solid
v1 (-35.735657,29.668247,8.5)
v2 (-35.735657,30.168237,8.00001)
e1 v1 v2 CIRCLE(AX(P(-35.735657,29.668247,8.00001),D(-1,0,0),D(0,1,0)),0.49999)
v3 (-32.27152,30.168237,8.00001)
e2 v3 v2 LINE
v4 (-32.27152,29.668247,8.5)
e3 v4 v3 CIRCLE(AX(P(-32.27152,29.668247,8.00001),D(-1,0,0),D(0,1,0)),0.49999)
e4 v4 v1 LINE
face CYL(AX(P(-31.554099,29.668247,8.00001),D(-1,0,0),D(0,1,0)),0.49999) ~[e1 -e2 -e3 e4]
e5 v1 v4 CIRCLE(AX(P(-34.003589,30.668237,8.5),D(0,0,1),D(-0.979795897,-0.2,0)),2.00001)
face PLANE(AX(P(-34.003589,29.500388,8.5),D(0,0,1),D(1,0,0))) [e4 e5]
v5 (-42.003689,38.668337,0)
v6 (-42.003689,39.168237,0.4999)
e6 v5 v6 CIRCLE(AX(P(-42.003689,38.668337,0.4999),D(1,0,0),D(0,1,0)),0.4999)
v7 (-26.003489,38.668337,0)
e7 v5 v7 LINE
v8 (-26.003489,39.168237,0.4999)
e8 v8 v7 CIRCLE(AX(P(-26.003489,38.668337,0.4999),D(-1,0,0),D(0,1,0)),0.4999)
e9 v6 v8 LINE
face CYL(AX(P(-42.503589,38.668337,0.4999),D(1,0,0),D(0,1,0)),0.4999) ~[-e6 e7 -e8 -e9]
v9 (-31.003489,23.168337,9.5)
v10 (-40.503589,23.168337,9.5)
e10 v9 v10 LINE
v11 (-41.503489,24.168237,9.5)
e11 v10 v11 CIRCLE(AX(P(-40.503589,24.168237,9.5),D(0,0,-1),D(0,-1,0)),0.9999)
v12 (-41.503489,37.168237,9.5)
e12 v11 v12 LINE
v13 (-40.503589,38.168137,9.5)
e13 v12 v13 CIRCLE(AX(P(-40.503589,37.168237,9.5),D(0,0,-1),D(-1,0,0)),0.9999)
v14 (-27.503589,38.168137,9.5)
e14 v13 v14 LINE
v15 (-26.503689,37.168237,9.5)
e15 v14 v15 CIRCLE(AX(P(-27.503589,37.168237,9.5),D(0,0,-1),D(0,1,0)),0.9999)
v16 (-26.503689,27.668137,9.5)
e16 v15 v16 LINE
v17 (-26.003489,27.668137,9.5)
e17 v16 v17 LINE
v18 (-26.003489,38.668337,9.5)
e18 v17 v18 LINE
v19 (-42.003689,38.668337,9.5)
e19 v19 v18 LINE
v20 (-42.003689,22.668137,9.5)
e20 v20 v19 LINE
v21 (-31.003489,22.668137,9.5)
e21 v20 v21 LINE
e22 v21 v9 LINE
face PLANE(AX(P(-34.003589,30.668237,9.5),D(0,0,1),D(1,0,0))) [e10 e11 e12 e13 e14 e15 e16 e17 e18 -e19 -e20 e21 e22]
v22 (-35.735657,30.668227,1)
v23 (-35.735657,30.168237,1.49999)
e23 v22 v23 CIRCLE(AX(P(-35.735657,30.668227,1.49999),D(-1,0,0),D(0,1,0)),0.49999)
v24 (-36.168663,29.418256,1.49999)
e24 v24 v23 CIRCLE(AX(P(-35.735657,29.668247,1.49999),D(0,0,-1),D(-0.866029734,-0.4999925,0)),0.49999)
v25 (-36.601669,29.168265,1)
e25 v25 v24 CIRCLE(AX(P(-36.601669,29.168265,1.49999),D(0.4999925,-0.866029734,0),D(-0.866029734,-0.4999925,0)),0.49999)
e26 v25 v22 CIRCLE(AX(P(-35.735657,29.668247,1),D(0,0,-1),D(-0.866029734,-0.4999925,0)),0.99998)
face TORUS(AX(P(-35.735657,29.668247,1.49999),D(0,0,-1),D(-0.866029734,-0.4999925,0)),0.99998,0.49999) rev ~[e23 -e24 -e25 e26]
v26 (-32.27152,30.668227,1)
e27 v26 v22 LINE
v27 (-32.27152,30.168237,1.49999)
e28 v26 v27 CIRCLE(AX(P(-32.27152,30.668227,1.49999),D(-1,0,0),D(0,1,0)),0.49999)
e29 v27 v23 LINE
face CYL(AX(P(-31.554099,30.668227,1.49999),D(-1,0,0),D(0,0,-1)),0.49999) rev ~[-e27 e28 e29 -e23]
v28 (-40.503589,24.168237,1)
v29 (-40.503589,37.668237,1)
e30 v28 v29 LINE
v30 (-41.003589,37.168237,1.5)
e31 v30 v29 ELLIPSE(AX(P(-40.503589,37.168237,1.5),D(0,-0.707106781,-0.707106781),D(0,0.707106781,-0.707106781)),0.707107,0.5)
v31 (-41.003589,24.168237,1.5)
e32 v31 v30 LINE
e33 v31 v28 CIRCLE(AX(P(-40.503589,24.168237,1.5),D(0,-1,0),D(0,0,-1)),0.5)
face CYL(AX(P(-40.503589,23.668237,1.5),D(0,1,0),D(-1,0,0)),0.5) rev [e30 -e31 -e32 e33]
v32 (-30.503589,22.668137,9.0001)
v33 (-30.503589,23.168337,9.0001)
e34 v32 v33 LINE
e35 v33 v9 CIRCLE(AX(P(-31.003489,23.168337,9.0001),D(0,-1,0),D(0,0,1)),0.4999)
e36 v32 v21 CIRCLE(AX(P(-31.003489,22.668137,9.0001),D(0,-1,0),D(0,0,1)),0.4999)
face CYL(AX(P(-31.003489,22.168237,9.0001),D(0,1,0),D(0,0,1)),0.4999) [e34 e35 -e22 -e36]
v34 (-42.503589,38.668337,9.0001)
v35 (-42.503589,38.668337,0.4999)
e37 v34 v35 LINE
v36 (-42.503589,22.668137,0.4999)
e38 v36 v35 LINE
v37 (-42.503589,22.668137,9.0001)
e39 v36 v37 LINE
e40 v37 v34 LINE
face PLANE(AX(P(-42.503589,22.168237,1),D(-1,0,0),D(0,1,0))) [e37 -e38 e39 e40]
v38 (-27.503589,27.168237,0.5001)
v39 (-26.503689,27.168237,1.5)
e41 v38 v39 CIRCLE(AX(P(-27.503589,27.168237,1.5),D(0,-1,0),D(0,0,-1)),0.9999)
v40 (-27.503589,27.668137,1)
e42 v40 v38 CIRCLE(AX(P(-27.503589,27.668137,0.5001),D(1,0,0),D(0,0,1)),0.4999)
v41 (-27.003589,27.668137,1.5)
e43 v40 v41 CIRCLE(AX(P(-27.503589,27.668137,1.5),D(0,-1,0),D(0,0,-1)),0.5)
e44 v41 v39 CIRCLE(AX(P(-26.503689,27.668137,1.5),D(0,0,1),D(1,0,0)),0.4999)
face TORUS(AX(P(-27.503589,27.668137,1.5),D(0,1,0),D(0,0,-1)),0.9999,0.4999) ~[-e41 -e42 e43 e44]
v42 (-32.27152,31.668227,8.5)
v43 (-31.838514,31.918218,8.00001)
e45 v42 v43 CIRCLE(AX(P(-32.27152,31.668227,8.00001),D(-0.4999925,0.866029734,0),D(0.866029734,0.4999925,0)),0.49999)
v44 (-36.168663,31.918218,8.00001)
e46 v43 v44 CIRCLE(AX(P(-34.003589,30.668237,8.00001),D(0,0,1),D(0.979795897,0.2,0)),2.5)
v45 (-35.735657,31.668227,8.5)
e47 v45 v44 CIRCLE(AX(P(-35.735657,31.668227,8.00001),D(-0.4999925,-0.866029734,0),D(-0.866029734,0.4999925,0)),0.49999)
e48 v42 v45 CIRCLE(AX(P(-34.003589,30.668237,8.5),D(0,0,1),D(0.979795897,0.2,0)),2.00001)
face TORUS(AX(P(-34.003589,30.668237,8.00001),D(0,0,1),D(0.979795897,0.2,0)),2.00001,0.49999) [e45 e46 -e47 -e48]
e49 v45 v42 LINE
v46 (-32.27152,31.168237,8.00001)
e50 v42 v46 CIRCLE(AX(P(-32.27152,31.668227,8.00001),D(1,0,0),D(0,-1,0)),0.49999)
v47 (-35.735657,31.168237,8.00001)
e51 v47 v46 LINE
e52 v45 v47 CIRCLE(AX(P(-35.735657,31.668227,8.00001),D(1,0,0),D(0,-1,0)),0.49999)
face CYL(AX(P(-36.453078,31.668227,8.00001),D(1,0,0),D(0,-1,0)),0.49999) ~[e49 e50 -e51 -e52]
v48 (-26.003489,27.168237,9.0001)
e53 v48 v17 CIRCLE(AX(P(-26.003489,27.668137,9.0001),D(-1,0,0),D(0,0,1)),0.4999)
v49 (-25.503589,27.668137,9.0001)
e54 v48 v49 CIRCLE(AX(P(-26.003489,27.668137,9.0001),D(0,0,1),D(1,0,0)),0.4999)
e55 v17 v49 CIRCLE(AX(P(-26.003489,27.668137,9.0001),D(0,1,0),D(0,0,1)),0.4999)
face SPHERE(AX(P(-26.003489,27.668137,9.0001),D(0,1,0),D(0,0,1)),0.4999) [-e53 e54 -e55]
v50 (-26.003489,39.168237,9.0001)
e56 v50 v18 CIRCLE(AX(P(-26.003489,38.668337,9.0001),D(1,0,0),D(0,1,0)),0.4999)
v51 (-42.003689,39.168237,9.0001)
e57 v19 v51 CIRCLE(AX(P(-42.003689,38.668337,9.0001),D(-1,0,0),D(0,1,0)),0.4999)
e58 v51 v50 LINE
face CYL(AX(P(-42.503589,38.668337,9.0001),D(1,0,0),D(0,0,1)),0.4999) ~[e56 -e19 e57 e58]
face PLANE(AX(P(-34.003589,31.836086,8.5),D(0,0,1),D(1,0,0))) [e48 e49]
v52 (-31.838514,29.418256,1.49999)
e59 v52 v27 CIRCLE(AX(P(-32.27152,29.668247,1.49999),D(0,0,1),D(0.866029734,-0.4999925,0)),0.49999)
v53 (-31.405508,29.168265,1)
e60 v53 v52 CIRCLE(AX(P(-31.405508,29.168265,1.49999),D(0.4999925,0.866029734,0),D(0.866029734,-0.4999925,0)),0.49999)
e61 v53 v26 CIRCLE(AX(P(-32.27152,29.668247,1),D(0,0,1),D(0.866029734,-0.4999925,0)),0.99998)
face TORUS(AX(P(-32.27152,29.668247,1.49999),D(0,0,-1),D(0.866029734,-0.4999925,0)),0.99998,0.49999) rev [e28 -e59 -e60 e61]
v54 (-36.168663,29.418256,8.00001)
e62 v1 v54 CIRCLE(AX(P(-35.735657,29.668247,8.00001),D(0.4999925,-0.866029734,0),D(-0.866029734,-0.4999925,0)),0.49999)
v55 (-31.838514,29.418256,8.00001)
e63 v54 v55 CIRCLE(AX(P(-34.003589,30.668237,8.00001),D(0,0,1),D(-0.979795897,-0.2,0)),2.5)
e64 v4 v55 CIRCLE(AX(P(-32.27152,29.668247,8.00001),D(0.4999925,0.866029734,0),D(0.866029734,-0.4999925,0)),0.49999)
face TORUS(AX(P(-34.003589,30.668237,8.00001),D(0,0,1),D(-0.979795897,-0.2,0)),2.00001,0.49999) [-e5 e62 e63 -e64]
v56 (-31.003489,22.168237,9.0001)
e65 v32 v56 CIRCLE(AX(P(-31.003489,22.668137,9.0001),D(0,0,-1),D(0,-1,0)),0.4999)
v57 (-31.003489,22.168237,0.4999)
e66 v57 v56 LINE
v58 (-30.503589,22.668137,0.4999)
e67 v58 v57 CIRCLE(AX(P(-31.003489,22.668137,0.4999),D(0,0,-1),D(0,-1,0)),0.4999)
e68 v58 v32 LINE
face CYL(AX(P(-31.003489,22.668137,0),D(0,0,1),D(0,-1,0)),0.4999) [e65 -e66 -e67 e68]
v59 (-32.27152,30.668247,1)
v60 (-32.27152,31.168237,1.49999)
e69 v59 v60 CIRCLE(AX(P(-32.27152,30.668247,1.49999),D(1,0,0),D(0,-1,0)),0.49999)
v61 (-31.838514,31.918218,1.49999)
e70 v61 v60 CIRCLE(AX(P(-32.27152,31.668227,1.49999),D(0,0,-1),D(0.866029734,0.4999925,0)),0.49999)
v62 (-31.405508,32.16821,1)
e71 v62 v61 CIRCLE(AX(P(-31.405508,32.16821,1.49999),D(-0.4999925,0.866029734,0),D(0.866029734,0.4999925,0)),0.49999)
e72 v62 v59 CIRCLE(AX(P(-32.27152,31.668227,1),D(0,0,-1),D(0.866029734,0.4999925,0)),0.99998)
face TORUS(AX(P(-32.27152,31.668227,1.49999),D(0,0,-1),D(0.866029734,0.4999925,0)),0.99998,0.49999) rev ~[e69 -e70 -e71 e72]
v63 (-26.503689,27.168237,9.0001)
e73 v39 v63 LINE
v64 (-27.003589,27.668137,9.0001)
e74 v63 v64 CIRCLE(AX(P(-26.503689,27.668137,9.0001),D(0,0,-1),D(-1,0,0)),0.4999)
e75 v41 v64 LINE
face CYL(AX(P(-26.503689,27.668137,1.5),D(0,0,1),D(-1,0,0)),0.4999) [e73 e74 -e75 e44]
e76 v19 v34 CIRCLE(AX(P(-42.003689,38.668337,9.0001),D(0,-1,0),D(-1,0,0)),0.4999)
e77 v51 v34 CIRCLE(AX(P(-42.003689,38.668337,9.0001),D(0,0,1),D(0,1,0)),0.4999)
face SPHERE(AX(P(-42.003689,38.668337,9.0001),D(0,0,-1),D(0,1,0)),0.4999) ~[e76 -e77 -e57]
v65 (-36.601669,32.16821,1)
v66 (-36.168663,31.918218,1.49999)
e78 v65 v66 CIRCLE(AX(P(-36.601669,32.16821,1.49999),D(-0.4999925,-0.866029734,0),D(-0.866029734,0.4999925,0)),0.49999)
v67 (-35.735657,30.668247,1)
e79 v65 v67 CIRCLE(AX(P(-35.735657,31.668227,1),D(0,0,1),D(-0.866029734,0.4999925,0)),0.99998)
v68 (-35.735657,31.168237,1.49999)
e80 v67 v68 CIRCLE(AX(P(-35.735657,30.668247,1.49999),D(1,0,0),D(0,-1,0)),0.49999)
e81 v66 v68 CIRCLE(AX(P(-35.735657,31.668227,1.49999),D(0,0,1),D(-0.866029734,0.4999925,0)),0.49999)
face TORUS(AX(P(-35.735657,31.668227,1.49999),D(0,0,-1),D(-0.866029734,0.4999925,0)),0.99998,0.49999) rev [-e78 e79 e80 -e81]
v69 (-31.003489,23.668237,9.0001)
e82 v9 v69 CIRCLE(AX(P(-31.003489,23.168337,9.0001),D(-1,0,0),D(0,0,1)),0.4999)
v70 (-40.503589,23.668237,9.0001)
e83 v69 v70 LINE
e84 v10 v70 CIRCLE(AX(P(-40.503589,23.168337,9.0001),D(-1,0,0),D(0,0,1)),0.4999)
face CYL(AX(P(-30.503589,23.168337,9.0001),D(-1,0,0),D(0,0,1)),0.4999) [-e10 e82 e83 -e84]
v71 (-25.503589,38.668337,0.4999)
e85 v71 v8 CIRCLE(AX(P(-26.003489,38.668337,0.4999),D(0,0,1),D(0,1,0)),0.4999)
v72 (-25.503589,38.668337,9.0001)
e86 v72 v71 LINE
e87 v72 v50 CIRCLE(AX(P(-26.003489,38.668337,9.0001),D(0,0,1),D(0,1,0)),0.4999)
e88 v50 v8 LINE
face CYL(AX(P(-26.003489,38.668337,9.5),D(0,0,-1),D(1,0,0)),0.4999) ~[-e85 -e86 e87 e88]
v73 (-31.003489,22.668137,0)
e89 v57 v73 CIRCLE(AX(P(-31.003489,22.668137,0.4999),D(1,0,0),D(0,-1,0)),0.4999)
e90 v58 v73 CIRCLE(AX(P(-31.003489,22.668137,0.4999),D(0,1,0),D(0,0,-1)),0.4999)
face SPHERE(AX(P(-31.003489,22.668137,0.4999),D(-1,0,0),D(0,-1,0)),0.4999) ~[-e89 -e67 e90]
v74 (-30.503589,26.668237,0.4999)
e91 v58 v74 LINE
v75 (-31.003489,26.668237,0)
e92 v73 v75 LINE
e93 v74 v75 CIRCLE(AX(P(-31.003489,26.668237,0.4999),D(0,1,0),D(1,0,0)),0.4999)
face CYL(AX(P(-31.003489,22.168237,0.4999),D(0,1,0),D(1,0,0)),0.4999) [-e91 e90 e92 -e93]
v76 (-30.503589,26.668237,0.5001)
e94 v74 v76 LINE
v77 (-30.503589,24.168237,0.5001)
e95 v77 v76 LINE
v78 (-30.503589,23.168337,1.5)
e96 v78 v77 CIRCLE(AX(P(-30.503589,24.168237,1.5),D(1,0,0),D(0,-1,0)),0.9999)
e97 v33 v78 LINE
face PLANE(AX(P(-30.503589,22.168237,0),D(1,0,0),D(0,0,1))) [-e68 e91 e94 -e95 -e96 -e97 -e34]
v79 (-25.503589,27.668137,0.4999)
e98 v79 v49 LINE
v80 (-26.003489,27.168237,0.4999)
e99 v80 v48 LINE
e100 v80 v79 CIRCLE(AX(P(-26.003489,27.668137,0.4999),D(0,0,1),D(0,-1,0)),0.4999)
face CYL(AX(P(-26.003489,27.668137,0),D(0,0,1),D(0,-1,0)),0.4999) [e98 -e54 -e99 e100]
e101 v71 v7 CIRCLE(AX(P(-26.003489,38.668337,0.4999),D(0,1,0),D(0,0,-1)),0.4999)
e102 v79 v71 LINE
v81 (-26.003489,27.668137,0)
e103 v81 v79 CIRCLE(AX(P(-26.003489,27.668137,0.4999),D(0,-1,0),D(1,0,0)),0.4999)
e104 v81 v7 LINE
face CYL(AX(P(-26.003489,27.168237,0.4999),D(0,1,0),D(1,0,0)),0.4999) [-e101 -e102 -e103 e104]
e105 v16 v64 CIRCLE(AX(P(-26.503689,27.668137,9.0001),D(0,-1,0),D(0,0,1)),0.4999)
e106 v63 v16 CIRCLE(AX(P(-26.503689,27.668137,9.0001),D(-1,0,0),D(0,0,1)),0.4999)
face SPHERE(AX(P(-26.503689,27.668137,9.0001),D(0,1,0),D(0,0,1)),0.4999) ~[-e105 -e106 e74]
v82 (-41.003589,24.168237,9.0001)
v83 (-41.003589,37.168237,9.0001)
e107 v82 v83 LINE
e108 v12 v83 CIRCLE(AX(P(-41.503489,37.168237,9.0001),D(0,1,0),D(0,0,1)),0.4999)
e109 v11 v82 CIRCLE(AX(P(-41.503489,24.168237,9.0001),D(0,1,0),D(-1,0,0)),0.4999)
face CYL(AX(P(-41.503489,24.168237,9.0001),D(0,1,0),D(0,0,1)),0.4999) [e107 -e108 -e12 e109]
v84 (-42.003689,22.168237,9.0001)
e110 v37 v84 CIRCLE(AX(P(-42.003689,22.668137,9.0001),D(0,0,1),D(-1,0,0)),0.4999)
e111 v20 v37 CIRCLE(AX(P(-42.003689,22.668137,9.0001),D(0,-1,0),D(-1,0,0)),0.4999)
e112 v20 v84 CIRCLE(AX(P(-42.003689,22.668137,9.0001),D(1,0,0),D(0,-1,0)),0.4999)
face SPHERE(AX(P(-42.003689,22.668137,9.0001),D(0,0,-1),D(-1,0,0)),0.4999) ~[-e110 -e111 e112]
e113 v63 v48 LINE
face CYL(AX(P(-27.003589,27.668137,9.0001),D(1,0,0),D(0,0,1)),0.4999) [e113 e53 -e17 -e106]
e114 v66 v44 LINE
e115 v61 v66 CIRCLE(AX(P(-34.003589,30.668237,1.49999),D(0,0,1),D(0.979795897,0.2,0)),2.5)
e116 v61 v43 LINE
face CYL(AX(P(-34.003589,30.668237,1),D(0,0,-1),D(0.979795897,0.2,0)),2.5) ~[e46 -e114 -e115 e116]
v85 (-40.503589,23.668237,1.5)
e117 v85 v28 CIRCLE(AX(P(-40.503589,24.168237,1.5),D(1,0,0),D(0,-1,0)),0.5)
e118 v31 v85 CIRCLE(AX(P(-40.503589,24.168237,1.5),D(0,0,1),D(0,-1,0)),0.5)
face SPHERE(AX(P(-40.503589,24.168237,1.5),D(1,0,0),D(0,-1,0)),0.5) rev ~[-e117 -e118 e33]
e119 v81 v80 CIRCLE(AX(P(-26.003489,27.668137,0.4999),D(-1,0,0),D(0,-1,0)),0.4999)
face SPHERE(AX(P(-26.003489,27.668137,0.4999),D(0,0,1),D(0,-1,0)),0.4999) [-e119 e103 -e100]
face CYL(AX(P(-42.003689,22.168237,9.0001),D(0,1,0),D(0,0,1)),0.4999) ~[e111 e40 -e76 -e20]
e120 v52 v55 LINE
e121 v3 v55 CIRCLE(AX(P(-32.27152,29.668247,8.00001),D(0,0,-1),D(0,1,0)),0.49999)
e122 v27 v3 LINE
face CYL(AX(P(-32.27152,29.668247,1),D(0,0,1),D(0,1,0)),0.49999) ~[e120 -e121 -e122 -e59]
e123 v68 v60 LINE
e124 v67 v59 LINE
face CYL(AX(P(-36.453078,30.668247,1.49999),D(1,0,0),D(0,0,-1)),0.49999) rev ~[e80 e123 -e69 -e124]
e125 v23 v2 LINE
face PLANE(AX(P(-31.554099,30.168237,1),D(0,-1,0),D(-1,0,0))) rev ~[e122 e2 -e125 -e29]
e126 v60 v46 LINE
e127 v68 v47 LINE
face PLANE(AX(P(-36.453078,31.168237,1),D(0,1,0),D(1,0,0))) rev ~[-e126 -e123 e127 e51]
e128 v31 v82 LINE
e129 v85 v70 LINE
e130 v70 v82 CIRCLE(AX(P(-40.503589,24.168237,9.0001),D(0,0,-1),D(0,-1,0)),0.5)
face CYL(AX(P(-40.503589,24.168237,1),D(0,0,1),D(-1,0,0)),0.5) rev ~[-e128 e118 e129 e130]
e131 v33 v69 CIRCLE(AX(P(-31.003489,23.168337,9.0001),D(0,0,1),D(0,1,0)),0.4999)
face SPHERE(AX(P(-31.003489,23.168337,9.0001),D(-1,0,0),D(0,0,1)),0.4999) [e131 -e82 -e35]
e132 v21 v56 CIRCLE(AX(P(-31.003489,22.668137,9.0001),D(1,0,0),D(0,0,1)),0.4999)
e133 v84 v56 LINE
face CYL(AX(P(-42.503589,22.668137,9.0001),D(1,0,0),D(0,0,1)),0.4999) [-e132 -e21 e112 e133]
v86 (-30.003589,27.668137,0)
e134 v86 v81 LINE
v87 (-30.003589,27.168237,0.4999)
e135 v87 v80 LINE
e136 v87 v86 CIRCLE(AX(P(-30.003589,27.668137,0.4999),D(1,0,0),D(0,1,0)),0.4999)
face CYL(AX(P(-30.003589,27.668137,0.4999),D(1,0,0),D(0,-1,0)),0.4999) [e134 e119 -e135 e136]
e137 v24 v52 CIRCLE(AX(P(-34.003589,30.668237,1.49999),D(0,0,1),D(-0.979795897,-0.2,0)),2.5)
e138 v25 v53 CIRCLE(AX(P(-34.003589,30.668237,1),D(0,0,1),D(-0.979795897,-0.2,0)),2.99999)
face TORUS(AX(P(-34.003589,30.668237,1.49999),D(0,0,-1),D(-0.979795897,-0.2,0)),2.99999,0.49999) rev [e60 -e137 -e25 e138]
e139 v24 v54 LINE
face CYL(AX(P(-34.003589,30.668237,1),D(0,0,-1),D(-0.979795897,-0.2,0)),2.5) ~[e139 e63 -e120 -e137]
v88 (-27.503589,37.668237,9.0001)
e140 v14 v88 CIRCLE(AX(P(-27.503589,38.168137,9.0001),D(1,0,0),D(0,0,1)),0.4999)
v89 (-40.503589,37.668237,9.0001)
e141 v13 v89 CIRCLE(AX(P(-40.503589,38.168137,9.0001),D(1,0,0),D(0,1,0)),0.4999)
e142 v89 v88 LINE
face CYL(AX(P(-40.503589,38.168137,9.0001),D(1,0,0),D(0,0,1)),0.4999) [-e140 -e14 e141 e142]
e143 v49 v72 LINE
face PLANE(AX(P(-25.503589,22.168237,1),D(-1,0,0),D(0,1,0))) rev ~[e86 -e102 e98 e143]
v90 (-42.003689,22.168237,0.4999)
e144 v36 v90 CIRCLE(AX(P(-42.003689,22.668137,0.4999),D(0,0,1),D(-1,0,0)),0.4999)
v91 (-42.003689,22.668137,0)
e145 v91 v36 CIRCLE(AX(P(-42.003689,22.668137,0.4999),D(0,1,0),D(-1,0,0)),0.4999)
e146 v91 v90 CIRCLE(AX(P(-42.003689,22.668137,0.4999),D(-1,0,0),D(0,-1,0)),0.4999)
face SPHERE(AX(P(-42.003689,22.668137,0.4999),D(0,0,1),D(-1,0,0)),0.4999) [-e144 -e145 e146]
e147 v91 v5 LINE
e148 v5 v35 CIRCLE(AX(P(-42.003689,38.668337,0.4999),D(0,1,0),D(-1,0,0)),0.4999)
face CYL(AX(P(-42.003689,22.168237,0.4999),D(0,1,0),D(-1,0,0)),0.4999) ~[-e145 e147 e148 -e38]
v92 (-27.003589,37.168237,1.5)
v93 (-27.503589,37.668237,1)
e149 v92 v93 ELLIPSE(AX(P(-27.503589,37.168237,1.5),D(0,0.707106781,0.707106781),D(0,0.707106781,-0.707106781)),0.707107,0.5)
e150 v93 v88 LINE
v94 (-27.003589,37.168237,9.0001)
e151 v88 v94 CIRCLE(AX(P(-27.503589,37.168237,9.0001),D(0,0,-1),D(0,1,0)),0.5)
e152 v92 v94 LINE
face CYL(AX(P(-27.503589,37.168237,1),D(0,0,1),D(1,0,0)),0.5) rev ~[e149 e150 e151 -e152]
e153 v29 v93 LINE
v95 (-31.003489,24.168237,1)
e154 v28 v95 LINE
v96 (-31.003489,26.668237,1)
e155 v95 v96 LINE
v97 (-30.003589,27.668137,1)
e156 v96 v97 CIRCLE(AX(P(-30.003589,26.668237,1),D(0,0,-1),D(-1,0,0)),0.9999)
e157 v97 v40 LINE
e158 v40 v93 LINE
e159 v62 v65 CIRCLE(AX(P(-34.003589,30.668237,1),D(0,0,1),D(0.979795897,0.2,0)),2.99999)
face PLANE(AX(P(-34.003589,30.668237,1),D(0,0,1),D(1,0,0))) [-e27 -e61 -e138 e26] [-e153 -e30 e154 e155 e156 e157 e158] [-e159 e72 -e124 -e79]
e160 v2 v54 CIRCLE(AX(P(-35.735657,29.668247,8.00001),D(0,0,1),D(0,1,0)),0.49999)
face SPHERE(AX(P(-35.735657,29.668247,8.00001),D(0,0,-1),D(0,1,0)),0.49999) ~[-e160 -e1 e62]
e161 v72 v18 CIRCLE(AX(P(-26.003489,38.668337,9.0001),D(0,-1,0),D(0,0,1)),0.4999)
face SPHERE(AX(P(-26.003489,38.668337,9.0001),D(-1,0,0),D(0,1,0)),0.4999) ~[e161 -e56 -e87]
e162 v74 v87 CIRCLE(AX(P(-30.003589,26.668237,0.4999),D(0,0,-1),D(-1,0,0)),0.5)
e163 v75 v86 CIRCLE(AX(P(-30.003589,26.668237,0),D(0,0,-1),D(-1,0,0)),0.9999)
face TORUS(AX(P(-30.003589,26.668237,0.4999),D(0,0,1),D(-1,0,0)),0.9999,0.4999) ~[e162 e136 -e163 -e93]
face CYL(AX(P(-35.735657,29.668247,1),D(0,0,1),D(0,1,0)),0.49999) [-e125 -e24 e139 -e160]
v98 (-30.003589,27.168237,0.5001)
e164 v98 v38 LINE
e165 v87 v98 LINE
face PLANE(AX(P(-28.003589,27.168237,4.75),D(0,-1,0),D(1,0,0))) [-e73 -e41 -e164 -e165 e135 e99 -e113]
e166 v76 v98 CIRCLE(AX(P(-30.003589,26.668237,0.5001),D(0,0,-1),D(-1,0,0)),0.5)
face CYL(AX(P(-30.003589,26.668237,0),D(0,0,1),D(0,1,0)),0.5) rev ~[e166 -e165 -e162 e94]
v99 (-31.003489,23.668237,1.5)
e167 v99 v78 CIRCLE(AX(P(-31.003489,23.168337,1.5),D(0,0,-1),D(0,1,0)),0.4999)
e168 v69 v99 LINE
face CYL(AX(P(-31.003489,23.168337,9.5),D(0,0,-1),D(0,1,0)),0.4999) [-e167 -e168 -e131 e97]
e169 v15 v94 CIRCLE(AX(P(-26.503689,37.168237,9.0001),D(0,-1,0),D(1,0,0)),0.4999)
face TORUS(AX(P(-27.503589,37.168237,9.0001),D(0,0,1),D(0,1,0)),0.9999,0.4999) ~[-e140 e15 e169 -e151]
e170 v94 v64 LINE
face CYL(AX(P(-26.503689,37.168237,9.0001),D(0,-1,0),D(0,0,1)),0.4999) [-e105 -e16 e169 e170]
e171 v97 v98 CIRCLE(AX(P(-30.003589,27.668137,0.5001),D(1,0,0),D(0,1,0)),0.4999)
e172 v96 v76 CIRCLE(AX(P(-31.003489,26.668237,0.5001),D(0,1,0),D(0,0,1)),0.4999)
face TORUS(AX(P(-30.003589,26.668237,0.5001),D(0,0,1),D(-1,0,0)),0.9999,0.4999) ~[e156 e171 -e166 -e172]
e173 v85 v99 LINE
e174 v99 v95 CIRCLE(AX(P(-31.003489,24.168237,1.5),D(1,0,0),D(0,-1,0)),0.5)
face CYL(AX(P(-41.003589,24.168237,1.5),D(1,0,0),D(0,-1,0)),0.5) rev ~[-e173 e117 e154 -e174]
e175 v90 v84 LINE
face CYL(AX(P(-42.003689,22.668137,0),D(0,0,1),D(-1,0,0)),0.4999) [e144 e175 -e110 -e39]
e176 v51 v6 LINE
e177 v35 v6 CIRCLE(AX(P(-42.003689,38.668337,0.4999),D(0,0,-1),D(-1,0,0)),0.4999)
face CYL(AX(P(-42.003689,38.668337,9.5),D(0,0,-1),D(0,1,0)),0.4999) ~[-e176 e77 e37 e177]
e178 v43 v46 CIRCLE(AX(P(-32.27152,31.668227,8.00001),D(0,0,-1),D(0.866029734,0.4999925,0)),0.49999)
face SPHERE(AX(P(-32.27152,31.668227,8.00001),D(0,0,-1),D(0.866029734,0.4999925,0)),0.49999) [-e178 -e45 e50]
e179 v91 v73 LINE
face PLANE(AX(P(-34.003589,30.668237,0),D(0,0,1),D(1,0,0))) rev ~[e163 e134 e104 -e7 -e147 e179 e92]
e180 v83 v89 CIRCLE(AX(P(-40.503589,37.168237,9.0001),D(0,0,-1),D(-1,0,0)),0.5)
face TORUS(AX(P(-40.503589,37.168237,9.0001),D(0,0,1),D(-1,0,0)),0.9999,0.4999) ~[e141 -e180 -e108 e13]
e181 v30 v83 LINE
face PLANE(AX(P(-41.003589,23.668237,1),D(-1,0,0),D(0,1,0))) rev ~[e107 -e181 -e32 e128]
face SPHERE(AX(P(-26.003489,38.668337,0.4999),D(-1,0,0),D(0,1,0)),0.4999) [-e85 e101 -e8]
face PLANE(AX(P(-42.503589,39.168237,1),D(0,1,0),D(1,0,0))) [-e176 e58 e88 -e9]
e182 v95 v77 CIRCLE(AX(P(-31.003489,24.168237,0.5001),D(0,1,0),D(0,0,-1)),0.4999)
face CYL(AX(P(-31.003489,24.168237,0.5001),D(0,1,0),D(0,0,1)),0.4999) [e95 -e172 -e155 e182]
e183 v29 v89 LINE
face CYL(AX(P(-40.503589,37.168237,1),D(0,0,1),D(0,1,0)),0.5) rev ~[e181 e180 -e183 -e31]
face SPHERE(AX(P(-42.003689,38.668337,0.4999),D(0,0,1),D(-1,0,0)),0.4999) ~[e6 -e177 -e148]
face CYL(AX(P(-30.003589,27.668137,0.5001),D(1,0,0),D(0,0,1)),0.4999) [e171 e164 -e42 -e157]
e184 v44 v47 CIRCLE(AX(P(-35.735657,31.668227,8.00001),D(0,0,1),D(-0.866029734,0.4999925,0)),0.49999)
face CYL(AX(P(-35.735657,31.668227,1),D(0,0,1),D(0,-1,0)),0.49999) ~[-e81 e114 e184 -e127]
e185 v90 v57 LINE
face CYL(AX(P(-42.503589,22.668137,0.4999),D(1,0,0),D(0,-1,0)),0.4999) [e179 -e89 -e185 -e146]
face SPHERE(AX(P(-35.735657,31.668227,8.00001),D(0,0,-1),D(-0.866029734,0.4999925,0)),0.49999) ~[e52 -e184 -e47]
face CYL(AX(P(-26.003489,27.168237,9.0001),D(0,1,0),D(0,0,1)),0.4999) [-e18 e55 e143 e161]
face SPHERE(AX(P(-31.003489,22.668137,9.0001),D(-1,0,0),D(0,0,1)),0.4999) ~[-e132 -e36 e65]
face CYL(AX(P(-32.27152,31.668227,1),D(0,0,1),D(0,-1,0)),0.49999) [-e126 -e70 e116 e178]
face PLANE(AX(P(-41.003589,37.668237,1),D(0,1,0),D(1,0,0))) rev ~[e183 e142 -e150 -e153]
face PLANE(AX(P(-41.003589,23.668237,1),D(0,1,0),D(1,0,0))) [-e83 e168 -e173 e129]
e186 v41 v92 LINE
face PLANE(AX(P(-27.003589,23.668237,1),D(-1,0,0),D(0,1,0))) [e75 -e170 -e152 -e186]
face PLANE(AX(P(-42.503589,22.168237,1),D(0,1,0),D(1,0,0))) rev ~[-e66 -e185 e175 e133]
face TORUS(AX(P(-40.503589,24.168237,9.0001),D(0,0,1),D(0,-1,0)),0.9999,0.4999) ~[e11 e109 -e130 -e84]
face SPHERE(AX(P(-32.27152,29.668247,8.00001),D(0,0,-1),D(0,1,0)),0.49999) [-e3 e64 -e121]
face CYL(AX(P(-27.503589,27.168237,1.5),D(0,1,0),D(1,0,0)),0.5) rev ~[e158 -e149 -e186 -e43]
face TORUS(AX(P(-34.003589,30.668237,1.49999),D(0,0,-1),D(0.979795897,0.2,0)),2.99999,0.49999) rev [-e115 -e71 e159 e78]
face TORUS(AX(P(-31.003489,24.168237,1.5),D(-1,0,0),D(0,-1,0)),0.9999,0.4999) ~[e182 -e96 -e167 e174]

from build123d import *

# Parameters (mm, degrees)
F0_W     = 17
F0_H     = 17
F1_DEPTH = 1
F2_W     = 17
F2_H     = 17
F2_W_2   = 14
F2_H_2   = 14
F3_DEPTH = 8.5
F4_W     = 5
F4_H     = 9.5
F5_DEPTH = 5
F7_DEPTH = 7.5
F8_F1_R  = 0.5
F8_F2_R  = 0.4999
F9_R     = 0.49999


# Not quite as in the source:
# - a fillet or chamfer is up to 0.001 mm smaller than in the source, because OpenCascade refuses the exact size
# - a feature names something its author has since deleted; it is built from what else it names


with BuildPart() as f1:
    # F0 (on Top) → F1 (new body)
    with BuildSketch(Plane.XY):
        with Locations((-34.0035885349, 30.668237003)):
            Rectangle(F0_W, F0_H)
    extrude(amount=F1_DEPTH)

    # F2 (on face) → F3 (join)
    with BuildSketch(Plane.XY.offset(1)):
        with Locations((-34.0035885349, 30.668237003)):
            Rectangle(F2_W, F2_H)
        with Locations((-34.0035885349, 30.668237003)):
            Rectangle(F2_W_2, F2_H_2, mode=Mode.SUBTRACT)
    extrude(amount=F3_DEPTH)

    # F4 (on face) → F5 (cut)
    with BuildSketch(Plane.XZ.offset(-22.168237003)):
        with Locations((-28.0035885349, 4.75)):
            Rectangle(F4_W, F4_H)
    extrude(amount=-F5_DEPTH, mode=Mode.SUBTRACT)

    # F6 (on face) → F7 (join)
    with BuildSketch(Plane.XY.offset(1)):
        with BuildLine():
            Line((-31.5540987921, 30.168237003), (-36.4530782777, 30.168237003))
            ThreePointArc((-36.4530782777, 30.168237003), (-34.0035885349, 28.168237003), (-31.5540987921, 30.168237003))
        make_face()
        with BuildLine():
            Line((-36.4530782777, 31.168237003), (-31.5540987921, 31.168237003))
            ThreePointArc((-31.5540987921, 31.168237003), (-34.0035885349, 33.168237003), (-36.4530782777, 31.168237003))
        make_face()
    extrude(amount=F7_DEPTH)

    # F8: fillet of radius 0.5 on 31 edges, made by hand

    # F8_f1
    f8_f1_edges = [f1.edges().sort_by_distance(p)[0] for p in [
        (-35.7535885349, 23.668237003, 1),
        (-41.0035885349, 23.668237003, 5.25),
        (-41.0035885349, 30.668237003, 1),
        (-27.0035885349, 32.418237003, 1),
        (-27.0035885349, 37.668237003, 5.25),
        (-41.0035885349, 37.668237003, 5.25),
        (-30.5035885349, 27.168237003, 0.5),
    ]]
    fillet(f8_f1_edges, radius=F8_F1_R)

    # F8_f2 (radius 0.5 in the source; OpenCascade refuses exactly that, so slightly less here)
    f8_f2_edges = [f1.edges().sort_by_distance(p)[0] for p in [
        (-42.5035885349, 39.168237003, 4.75),
        (-42.5035885349, 22.168237003, 4.75),
        (-34.0035885349, 39.168237003, 9.5),
        (-42.5035885349, 30.668237003, 9.5),
        (-42.5035885349, 30.668237003, 0),
        (-34.0035885349, 39.168237003, 0),
        (-25.5035885349, 39.168237003, 4.75),
        (-34.0035885349, 37.668237003, 9.5),
        (-41.0035885349, 30.668237003, 9.5),
        (-35.5035885349, 23.668237003, 9.5),
        (-36.5035885349, 22.168237003, 9.5),
        (-30.5035885349, 22.918237003, 9.5),
        (-27.0035885349, 32.168237003, 9.5),
        (-25.5035885349, 33.168237003, 9.5),
        (-26.2535885349, 27.168237003, 9.5),
        (-27.0035885349, 27.168237003, 5.5),
        (-25.5035885349, 27.168237003, 4.75),
        (-36.5035885349, 22.168237003, 0),
        (-30.5035885349, 22.168237003, 4.75),
        (-30.5035885349, 24.418237003, 0),
        (-30.5035885349, 25.418237003, 1),
        (-27.7535885349, 27.168237003, 0),
        (-25.5035885349, 33.168237003, 0),
        (-30.5035885349, 23.668237003, 5.5),
        (-30.5035885349, 23.8146836124, 1.1464466094),
        (-30.3571419255, 27.0217903936, 0),
        (-30.3571419255, 27.0217903936, 1),
        (-27.1500351443, 27.168237003, 1.1464466094),
        (-27.1500351443, 37.5217903936, 9.5),
        (-40.8571419255, 23.8146836124, 9.5),
        (-40.8571419255, 37.5217903936, 9.5),
    ]]
    fillet(f8_f2_edges, radius=F8_F2_R)

    # F9 (radius 0.5 in the source; OpenCascade refuses exactly that, so slightly less here)
    f9_edges = [f1.edges().sort_by_distance(p)[0] for p in [
        (-34.003589, 33.168237, 8.5),
        (-34.003589, 31.168237, 8.5),
        (-34.003589, 30.168237, 8.5),
        (-34.003589, 28.168237, 8.5),
        (-31.554099, 31.168237, 4.75),
        (-36.453078, 30.168237, 4.75),
        (-34.003589, 28.168237, 1),
        (-36.453078, 31.168237, 4.75),
        (-34.003589, 33.168237, 1),
        (-34.003589, 30.168237, 1),
        (-34.003589, 31.168237, 1),
        (-31.554099, 30.168237, 4.75),
    ]]
    fillet(f9_edges, radius=F9_R)


solid = f1.part
